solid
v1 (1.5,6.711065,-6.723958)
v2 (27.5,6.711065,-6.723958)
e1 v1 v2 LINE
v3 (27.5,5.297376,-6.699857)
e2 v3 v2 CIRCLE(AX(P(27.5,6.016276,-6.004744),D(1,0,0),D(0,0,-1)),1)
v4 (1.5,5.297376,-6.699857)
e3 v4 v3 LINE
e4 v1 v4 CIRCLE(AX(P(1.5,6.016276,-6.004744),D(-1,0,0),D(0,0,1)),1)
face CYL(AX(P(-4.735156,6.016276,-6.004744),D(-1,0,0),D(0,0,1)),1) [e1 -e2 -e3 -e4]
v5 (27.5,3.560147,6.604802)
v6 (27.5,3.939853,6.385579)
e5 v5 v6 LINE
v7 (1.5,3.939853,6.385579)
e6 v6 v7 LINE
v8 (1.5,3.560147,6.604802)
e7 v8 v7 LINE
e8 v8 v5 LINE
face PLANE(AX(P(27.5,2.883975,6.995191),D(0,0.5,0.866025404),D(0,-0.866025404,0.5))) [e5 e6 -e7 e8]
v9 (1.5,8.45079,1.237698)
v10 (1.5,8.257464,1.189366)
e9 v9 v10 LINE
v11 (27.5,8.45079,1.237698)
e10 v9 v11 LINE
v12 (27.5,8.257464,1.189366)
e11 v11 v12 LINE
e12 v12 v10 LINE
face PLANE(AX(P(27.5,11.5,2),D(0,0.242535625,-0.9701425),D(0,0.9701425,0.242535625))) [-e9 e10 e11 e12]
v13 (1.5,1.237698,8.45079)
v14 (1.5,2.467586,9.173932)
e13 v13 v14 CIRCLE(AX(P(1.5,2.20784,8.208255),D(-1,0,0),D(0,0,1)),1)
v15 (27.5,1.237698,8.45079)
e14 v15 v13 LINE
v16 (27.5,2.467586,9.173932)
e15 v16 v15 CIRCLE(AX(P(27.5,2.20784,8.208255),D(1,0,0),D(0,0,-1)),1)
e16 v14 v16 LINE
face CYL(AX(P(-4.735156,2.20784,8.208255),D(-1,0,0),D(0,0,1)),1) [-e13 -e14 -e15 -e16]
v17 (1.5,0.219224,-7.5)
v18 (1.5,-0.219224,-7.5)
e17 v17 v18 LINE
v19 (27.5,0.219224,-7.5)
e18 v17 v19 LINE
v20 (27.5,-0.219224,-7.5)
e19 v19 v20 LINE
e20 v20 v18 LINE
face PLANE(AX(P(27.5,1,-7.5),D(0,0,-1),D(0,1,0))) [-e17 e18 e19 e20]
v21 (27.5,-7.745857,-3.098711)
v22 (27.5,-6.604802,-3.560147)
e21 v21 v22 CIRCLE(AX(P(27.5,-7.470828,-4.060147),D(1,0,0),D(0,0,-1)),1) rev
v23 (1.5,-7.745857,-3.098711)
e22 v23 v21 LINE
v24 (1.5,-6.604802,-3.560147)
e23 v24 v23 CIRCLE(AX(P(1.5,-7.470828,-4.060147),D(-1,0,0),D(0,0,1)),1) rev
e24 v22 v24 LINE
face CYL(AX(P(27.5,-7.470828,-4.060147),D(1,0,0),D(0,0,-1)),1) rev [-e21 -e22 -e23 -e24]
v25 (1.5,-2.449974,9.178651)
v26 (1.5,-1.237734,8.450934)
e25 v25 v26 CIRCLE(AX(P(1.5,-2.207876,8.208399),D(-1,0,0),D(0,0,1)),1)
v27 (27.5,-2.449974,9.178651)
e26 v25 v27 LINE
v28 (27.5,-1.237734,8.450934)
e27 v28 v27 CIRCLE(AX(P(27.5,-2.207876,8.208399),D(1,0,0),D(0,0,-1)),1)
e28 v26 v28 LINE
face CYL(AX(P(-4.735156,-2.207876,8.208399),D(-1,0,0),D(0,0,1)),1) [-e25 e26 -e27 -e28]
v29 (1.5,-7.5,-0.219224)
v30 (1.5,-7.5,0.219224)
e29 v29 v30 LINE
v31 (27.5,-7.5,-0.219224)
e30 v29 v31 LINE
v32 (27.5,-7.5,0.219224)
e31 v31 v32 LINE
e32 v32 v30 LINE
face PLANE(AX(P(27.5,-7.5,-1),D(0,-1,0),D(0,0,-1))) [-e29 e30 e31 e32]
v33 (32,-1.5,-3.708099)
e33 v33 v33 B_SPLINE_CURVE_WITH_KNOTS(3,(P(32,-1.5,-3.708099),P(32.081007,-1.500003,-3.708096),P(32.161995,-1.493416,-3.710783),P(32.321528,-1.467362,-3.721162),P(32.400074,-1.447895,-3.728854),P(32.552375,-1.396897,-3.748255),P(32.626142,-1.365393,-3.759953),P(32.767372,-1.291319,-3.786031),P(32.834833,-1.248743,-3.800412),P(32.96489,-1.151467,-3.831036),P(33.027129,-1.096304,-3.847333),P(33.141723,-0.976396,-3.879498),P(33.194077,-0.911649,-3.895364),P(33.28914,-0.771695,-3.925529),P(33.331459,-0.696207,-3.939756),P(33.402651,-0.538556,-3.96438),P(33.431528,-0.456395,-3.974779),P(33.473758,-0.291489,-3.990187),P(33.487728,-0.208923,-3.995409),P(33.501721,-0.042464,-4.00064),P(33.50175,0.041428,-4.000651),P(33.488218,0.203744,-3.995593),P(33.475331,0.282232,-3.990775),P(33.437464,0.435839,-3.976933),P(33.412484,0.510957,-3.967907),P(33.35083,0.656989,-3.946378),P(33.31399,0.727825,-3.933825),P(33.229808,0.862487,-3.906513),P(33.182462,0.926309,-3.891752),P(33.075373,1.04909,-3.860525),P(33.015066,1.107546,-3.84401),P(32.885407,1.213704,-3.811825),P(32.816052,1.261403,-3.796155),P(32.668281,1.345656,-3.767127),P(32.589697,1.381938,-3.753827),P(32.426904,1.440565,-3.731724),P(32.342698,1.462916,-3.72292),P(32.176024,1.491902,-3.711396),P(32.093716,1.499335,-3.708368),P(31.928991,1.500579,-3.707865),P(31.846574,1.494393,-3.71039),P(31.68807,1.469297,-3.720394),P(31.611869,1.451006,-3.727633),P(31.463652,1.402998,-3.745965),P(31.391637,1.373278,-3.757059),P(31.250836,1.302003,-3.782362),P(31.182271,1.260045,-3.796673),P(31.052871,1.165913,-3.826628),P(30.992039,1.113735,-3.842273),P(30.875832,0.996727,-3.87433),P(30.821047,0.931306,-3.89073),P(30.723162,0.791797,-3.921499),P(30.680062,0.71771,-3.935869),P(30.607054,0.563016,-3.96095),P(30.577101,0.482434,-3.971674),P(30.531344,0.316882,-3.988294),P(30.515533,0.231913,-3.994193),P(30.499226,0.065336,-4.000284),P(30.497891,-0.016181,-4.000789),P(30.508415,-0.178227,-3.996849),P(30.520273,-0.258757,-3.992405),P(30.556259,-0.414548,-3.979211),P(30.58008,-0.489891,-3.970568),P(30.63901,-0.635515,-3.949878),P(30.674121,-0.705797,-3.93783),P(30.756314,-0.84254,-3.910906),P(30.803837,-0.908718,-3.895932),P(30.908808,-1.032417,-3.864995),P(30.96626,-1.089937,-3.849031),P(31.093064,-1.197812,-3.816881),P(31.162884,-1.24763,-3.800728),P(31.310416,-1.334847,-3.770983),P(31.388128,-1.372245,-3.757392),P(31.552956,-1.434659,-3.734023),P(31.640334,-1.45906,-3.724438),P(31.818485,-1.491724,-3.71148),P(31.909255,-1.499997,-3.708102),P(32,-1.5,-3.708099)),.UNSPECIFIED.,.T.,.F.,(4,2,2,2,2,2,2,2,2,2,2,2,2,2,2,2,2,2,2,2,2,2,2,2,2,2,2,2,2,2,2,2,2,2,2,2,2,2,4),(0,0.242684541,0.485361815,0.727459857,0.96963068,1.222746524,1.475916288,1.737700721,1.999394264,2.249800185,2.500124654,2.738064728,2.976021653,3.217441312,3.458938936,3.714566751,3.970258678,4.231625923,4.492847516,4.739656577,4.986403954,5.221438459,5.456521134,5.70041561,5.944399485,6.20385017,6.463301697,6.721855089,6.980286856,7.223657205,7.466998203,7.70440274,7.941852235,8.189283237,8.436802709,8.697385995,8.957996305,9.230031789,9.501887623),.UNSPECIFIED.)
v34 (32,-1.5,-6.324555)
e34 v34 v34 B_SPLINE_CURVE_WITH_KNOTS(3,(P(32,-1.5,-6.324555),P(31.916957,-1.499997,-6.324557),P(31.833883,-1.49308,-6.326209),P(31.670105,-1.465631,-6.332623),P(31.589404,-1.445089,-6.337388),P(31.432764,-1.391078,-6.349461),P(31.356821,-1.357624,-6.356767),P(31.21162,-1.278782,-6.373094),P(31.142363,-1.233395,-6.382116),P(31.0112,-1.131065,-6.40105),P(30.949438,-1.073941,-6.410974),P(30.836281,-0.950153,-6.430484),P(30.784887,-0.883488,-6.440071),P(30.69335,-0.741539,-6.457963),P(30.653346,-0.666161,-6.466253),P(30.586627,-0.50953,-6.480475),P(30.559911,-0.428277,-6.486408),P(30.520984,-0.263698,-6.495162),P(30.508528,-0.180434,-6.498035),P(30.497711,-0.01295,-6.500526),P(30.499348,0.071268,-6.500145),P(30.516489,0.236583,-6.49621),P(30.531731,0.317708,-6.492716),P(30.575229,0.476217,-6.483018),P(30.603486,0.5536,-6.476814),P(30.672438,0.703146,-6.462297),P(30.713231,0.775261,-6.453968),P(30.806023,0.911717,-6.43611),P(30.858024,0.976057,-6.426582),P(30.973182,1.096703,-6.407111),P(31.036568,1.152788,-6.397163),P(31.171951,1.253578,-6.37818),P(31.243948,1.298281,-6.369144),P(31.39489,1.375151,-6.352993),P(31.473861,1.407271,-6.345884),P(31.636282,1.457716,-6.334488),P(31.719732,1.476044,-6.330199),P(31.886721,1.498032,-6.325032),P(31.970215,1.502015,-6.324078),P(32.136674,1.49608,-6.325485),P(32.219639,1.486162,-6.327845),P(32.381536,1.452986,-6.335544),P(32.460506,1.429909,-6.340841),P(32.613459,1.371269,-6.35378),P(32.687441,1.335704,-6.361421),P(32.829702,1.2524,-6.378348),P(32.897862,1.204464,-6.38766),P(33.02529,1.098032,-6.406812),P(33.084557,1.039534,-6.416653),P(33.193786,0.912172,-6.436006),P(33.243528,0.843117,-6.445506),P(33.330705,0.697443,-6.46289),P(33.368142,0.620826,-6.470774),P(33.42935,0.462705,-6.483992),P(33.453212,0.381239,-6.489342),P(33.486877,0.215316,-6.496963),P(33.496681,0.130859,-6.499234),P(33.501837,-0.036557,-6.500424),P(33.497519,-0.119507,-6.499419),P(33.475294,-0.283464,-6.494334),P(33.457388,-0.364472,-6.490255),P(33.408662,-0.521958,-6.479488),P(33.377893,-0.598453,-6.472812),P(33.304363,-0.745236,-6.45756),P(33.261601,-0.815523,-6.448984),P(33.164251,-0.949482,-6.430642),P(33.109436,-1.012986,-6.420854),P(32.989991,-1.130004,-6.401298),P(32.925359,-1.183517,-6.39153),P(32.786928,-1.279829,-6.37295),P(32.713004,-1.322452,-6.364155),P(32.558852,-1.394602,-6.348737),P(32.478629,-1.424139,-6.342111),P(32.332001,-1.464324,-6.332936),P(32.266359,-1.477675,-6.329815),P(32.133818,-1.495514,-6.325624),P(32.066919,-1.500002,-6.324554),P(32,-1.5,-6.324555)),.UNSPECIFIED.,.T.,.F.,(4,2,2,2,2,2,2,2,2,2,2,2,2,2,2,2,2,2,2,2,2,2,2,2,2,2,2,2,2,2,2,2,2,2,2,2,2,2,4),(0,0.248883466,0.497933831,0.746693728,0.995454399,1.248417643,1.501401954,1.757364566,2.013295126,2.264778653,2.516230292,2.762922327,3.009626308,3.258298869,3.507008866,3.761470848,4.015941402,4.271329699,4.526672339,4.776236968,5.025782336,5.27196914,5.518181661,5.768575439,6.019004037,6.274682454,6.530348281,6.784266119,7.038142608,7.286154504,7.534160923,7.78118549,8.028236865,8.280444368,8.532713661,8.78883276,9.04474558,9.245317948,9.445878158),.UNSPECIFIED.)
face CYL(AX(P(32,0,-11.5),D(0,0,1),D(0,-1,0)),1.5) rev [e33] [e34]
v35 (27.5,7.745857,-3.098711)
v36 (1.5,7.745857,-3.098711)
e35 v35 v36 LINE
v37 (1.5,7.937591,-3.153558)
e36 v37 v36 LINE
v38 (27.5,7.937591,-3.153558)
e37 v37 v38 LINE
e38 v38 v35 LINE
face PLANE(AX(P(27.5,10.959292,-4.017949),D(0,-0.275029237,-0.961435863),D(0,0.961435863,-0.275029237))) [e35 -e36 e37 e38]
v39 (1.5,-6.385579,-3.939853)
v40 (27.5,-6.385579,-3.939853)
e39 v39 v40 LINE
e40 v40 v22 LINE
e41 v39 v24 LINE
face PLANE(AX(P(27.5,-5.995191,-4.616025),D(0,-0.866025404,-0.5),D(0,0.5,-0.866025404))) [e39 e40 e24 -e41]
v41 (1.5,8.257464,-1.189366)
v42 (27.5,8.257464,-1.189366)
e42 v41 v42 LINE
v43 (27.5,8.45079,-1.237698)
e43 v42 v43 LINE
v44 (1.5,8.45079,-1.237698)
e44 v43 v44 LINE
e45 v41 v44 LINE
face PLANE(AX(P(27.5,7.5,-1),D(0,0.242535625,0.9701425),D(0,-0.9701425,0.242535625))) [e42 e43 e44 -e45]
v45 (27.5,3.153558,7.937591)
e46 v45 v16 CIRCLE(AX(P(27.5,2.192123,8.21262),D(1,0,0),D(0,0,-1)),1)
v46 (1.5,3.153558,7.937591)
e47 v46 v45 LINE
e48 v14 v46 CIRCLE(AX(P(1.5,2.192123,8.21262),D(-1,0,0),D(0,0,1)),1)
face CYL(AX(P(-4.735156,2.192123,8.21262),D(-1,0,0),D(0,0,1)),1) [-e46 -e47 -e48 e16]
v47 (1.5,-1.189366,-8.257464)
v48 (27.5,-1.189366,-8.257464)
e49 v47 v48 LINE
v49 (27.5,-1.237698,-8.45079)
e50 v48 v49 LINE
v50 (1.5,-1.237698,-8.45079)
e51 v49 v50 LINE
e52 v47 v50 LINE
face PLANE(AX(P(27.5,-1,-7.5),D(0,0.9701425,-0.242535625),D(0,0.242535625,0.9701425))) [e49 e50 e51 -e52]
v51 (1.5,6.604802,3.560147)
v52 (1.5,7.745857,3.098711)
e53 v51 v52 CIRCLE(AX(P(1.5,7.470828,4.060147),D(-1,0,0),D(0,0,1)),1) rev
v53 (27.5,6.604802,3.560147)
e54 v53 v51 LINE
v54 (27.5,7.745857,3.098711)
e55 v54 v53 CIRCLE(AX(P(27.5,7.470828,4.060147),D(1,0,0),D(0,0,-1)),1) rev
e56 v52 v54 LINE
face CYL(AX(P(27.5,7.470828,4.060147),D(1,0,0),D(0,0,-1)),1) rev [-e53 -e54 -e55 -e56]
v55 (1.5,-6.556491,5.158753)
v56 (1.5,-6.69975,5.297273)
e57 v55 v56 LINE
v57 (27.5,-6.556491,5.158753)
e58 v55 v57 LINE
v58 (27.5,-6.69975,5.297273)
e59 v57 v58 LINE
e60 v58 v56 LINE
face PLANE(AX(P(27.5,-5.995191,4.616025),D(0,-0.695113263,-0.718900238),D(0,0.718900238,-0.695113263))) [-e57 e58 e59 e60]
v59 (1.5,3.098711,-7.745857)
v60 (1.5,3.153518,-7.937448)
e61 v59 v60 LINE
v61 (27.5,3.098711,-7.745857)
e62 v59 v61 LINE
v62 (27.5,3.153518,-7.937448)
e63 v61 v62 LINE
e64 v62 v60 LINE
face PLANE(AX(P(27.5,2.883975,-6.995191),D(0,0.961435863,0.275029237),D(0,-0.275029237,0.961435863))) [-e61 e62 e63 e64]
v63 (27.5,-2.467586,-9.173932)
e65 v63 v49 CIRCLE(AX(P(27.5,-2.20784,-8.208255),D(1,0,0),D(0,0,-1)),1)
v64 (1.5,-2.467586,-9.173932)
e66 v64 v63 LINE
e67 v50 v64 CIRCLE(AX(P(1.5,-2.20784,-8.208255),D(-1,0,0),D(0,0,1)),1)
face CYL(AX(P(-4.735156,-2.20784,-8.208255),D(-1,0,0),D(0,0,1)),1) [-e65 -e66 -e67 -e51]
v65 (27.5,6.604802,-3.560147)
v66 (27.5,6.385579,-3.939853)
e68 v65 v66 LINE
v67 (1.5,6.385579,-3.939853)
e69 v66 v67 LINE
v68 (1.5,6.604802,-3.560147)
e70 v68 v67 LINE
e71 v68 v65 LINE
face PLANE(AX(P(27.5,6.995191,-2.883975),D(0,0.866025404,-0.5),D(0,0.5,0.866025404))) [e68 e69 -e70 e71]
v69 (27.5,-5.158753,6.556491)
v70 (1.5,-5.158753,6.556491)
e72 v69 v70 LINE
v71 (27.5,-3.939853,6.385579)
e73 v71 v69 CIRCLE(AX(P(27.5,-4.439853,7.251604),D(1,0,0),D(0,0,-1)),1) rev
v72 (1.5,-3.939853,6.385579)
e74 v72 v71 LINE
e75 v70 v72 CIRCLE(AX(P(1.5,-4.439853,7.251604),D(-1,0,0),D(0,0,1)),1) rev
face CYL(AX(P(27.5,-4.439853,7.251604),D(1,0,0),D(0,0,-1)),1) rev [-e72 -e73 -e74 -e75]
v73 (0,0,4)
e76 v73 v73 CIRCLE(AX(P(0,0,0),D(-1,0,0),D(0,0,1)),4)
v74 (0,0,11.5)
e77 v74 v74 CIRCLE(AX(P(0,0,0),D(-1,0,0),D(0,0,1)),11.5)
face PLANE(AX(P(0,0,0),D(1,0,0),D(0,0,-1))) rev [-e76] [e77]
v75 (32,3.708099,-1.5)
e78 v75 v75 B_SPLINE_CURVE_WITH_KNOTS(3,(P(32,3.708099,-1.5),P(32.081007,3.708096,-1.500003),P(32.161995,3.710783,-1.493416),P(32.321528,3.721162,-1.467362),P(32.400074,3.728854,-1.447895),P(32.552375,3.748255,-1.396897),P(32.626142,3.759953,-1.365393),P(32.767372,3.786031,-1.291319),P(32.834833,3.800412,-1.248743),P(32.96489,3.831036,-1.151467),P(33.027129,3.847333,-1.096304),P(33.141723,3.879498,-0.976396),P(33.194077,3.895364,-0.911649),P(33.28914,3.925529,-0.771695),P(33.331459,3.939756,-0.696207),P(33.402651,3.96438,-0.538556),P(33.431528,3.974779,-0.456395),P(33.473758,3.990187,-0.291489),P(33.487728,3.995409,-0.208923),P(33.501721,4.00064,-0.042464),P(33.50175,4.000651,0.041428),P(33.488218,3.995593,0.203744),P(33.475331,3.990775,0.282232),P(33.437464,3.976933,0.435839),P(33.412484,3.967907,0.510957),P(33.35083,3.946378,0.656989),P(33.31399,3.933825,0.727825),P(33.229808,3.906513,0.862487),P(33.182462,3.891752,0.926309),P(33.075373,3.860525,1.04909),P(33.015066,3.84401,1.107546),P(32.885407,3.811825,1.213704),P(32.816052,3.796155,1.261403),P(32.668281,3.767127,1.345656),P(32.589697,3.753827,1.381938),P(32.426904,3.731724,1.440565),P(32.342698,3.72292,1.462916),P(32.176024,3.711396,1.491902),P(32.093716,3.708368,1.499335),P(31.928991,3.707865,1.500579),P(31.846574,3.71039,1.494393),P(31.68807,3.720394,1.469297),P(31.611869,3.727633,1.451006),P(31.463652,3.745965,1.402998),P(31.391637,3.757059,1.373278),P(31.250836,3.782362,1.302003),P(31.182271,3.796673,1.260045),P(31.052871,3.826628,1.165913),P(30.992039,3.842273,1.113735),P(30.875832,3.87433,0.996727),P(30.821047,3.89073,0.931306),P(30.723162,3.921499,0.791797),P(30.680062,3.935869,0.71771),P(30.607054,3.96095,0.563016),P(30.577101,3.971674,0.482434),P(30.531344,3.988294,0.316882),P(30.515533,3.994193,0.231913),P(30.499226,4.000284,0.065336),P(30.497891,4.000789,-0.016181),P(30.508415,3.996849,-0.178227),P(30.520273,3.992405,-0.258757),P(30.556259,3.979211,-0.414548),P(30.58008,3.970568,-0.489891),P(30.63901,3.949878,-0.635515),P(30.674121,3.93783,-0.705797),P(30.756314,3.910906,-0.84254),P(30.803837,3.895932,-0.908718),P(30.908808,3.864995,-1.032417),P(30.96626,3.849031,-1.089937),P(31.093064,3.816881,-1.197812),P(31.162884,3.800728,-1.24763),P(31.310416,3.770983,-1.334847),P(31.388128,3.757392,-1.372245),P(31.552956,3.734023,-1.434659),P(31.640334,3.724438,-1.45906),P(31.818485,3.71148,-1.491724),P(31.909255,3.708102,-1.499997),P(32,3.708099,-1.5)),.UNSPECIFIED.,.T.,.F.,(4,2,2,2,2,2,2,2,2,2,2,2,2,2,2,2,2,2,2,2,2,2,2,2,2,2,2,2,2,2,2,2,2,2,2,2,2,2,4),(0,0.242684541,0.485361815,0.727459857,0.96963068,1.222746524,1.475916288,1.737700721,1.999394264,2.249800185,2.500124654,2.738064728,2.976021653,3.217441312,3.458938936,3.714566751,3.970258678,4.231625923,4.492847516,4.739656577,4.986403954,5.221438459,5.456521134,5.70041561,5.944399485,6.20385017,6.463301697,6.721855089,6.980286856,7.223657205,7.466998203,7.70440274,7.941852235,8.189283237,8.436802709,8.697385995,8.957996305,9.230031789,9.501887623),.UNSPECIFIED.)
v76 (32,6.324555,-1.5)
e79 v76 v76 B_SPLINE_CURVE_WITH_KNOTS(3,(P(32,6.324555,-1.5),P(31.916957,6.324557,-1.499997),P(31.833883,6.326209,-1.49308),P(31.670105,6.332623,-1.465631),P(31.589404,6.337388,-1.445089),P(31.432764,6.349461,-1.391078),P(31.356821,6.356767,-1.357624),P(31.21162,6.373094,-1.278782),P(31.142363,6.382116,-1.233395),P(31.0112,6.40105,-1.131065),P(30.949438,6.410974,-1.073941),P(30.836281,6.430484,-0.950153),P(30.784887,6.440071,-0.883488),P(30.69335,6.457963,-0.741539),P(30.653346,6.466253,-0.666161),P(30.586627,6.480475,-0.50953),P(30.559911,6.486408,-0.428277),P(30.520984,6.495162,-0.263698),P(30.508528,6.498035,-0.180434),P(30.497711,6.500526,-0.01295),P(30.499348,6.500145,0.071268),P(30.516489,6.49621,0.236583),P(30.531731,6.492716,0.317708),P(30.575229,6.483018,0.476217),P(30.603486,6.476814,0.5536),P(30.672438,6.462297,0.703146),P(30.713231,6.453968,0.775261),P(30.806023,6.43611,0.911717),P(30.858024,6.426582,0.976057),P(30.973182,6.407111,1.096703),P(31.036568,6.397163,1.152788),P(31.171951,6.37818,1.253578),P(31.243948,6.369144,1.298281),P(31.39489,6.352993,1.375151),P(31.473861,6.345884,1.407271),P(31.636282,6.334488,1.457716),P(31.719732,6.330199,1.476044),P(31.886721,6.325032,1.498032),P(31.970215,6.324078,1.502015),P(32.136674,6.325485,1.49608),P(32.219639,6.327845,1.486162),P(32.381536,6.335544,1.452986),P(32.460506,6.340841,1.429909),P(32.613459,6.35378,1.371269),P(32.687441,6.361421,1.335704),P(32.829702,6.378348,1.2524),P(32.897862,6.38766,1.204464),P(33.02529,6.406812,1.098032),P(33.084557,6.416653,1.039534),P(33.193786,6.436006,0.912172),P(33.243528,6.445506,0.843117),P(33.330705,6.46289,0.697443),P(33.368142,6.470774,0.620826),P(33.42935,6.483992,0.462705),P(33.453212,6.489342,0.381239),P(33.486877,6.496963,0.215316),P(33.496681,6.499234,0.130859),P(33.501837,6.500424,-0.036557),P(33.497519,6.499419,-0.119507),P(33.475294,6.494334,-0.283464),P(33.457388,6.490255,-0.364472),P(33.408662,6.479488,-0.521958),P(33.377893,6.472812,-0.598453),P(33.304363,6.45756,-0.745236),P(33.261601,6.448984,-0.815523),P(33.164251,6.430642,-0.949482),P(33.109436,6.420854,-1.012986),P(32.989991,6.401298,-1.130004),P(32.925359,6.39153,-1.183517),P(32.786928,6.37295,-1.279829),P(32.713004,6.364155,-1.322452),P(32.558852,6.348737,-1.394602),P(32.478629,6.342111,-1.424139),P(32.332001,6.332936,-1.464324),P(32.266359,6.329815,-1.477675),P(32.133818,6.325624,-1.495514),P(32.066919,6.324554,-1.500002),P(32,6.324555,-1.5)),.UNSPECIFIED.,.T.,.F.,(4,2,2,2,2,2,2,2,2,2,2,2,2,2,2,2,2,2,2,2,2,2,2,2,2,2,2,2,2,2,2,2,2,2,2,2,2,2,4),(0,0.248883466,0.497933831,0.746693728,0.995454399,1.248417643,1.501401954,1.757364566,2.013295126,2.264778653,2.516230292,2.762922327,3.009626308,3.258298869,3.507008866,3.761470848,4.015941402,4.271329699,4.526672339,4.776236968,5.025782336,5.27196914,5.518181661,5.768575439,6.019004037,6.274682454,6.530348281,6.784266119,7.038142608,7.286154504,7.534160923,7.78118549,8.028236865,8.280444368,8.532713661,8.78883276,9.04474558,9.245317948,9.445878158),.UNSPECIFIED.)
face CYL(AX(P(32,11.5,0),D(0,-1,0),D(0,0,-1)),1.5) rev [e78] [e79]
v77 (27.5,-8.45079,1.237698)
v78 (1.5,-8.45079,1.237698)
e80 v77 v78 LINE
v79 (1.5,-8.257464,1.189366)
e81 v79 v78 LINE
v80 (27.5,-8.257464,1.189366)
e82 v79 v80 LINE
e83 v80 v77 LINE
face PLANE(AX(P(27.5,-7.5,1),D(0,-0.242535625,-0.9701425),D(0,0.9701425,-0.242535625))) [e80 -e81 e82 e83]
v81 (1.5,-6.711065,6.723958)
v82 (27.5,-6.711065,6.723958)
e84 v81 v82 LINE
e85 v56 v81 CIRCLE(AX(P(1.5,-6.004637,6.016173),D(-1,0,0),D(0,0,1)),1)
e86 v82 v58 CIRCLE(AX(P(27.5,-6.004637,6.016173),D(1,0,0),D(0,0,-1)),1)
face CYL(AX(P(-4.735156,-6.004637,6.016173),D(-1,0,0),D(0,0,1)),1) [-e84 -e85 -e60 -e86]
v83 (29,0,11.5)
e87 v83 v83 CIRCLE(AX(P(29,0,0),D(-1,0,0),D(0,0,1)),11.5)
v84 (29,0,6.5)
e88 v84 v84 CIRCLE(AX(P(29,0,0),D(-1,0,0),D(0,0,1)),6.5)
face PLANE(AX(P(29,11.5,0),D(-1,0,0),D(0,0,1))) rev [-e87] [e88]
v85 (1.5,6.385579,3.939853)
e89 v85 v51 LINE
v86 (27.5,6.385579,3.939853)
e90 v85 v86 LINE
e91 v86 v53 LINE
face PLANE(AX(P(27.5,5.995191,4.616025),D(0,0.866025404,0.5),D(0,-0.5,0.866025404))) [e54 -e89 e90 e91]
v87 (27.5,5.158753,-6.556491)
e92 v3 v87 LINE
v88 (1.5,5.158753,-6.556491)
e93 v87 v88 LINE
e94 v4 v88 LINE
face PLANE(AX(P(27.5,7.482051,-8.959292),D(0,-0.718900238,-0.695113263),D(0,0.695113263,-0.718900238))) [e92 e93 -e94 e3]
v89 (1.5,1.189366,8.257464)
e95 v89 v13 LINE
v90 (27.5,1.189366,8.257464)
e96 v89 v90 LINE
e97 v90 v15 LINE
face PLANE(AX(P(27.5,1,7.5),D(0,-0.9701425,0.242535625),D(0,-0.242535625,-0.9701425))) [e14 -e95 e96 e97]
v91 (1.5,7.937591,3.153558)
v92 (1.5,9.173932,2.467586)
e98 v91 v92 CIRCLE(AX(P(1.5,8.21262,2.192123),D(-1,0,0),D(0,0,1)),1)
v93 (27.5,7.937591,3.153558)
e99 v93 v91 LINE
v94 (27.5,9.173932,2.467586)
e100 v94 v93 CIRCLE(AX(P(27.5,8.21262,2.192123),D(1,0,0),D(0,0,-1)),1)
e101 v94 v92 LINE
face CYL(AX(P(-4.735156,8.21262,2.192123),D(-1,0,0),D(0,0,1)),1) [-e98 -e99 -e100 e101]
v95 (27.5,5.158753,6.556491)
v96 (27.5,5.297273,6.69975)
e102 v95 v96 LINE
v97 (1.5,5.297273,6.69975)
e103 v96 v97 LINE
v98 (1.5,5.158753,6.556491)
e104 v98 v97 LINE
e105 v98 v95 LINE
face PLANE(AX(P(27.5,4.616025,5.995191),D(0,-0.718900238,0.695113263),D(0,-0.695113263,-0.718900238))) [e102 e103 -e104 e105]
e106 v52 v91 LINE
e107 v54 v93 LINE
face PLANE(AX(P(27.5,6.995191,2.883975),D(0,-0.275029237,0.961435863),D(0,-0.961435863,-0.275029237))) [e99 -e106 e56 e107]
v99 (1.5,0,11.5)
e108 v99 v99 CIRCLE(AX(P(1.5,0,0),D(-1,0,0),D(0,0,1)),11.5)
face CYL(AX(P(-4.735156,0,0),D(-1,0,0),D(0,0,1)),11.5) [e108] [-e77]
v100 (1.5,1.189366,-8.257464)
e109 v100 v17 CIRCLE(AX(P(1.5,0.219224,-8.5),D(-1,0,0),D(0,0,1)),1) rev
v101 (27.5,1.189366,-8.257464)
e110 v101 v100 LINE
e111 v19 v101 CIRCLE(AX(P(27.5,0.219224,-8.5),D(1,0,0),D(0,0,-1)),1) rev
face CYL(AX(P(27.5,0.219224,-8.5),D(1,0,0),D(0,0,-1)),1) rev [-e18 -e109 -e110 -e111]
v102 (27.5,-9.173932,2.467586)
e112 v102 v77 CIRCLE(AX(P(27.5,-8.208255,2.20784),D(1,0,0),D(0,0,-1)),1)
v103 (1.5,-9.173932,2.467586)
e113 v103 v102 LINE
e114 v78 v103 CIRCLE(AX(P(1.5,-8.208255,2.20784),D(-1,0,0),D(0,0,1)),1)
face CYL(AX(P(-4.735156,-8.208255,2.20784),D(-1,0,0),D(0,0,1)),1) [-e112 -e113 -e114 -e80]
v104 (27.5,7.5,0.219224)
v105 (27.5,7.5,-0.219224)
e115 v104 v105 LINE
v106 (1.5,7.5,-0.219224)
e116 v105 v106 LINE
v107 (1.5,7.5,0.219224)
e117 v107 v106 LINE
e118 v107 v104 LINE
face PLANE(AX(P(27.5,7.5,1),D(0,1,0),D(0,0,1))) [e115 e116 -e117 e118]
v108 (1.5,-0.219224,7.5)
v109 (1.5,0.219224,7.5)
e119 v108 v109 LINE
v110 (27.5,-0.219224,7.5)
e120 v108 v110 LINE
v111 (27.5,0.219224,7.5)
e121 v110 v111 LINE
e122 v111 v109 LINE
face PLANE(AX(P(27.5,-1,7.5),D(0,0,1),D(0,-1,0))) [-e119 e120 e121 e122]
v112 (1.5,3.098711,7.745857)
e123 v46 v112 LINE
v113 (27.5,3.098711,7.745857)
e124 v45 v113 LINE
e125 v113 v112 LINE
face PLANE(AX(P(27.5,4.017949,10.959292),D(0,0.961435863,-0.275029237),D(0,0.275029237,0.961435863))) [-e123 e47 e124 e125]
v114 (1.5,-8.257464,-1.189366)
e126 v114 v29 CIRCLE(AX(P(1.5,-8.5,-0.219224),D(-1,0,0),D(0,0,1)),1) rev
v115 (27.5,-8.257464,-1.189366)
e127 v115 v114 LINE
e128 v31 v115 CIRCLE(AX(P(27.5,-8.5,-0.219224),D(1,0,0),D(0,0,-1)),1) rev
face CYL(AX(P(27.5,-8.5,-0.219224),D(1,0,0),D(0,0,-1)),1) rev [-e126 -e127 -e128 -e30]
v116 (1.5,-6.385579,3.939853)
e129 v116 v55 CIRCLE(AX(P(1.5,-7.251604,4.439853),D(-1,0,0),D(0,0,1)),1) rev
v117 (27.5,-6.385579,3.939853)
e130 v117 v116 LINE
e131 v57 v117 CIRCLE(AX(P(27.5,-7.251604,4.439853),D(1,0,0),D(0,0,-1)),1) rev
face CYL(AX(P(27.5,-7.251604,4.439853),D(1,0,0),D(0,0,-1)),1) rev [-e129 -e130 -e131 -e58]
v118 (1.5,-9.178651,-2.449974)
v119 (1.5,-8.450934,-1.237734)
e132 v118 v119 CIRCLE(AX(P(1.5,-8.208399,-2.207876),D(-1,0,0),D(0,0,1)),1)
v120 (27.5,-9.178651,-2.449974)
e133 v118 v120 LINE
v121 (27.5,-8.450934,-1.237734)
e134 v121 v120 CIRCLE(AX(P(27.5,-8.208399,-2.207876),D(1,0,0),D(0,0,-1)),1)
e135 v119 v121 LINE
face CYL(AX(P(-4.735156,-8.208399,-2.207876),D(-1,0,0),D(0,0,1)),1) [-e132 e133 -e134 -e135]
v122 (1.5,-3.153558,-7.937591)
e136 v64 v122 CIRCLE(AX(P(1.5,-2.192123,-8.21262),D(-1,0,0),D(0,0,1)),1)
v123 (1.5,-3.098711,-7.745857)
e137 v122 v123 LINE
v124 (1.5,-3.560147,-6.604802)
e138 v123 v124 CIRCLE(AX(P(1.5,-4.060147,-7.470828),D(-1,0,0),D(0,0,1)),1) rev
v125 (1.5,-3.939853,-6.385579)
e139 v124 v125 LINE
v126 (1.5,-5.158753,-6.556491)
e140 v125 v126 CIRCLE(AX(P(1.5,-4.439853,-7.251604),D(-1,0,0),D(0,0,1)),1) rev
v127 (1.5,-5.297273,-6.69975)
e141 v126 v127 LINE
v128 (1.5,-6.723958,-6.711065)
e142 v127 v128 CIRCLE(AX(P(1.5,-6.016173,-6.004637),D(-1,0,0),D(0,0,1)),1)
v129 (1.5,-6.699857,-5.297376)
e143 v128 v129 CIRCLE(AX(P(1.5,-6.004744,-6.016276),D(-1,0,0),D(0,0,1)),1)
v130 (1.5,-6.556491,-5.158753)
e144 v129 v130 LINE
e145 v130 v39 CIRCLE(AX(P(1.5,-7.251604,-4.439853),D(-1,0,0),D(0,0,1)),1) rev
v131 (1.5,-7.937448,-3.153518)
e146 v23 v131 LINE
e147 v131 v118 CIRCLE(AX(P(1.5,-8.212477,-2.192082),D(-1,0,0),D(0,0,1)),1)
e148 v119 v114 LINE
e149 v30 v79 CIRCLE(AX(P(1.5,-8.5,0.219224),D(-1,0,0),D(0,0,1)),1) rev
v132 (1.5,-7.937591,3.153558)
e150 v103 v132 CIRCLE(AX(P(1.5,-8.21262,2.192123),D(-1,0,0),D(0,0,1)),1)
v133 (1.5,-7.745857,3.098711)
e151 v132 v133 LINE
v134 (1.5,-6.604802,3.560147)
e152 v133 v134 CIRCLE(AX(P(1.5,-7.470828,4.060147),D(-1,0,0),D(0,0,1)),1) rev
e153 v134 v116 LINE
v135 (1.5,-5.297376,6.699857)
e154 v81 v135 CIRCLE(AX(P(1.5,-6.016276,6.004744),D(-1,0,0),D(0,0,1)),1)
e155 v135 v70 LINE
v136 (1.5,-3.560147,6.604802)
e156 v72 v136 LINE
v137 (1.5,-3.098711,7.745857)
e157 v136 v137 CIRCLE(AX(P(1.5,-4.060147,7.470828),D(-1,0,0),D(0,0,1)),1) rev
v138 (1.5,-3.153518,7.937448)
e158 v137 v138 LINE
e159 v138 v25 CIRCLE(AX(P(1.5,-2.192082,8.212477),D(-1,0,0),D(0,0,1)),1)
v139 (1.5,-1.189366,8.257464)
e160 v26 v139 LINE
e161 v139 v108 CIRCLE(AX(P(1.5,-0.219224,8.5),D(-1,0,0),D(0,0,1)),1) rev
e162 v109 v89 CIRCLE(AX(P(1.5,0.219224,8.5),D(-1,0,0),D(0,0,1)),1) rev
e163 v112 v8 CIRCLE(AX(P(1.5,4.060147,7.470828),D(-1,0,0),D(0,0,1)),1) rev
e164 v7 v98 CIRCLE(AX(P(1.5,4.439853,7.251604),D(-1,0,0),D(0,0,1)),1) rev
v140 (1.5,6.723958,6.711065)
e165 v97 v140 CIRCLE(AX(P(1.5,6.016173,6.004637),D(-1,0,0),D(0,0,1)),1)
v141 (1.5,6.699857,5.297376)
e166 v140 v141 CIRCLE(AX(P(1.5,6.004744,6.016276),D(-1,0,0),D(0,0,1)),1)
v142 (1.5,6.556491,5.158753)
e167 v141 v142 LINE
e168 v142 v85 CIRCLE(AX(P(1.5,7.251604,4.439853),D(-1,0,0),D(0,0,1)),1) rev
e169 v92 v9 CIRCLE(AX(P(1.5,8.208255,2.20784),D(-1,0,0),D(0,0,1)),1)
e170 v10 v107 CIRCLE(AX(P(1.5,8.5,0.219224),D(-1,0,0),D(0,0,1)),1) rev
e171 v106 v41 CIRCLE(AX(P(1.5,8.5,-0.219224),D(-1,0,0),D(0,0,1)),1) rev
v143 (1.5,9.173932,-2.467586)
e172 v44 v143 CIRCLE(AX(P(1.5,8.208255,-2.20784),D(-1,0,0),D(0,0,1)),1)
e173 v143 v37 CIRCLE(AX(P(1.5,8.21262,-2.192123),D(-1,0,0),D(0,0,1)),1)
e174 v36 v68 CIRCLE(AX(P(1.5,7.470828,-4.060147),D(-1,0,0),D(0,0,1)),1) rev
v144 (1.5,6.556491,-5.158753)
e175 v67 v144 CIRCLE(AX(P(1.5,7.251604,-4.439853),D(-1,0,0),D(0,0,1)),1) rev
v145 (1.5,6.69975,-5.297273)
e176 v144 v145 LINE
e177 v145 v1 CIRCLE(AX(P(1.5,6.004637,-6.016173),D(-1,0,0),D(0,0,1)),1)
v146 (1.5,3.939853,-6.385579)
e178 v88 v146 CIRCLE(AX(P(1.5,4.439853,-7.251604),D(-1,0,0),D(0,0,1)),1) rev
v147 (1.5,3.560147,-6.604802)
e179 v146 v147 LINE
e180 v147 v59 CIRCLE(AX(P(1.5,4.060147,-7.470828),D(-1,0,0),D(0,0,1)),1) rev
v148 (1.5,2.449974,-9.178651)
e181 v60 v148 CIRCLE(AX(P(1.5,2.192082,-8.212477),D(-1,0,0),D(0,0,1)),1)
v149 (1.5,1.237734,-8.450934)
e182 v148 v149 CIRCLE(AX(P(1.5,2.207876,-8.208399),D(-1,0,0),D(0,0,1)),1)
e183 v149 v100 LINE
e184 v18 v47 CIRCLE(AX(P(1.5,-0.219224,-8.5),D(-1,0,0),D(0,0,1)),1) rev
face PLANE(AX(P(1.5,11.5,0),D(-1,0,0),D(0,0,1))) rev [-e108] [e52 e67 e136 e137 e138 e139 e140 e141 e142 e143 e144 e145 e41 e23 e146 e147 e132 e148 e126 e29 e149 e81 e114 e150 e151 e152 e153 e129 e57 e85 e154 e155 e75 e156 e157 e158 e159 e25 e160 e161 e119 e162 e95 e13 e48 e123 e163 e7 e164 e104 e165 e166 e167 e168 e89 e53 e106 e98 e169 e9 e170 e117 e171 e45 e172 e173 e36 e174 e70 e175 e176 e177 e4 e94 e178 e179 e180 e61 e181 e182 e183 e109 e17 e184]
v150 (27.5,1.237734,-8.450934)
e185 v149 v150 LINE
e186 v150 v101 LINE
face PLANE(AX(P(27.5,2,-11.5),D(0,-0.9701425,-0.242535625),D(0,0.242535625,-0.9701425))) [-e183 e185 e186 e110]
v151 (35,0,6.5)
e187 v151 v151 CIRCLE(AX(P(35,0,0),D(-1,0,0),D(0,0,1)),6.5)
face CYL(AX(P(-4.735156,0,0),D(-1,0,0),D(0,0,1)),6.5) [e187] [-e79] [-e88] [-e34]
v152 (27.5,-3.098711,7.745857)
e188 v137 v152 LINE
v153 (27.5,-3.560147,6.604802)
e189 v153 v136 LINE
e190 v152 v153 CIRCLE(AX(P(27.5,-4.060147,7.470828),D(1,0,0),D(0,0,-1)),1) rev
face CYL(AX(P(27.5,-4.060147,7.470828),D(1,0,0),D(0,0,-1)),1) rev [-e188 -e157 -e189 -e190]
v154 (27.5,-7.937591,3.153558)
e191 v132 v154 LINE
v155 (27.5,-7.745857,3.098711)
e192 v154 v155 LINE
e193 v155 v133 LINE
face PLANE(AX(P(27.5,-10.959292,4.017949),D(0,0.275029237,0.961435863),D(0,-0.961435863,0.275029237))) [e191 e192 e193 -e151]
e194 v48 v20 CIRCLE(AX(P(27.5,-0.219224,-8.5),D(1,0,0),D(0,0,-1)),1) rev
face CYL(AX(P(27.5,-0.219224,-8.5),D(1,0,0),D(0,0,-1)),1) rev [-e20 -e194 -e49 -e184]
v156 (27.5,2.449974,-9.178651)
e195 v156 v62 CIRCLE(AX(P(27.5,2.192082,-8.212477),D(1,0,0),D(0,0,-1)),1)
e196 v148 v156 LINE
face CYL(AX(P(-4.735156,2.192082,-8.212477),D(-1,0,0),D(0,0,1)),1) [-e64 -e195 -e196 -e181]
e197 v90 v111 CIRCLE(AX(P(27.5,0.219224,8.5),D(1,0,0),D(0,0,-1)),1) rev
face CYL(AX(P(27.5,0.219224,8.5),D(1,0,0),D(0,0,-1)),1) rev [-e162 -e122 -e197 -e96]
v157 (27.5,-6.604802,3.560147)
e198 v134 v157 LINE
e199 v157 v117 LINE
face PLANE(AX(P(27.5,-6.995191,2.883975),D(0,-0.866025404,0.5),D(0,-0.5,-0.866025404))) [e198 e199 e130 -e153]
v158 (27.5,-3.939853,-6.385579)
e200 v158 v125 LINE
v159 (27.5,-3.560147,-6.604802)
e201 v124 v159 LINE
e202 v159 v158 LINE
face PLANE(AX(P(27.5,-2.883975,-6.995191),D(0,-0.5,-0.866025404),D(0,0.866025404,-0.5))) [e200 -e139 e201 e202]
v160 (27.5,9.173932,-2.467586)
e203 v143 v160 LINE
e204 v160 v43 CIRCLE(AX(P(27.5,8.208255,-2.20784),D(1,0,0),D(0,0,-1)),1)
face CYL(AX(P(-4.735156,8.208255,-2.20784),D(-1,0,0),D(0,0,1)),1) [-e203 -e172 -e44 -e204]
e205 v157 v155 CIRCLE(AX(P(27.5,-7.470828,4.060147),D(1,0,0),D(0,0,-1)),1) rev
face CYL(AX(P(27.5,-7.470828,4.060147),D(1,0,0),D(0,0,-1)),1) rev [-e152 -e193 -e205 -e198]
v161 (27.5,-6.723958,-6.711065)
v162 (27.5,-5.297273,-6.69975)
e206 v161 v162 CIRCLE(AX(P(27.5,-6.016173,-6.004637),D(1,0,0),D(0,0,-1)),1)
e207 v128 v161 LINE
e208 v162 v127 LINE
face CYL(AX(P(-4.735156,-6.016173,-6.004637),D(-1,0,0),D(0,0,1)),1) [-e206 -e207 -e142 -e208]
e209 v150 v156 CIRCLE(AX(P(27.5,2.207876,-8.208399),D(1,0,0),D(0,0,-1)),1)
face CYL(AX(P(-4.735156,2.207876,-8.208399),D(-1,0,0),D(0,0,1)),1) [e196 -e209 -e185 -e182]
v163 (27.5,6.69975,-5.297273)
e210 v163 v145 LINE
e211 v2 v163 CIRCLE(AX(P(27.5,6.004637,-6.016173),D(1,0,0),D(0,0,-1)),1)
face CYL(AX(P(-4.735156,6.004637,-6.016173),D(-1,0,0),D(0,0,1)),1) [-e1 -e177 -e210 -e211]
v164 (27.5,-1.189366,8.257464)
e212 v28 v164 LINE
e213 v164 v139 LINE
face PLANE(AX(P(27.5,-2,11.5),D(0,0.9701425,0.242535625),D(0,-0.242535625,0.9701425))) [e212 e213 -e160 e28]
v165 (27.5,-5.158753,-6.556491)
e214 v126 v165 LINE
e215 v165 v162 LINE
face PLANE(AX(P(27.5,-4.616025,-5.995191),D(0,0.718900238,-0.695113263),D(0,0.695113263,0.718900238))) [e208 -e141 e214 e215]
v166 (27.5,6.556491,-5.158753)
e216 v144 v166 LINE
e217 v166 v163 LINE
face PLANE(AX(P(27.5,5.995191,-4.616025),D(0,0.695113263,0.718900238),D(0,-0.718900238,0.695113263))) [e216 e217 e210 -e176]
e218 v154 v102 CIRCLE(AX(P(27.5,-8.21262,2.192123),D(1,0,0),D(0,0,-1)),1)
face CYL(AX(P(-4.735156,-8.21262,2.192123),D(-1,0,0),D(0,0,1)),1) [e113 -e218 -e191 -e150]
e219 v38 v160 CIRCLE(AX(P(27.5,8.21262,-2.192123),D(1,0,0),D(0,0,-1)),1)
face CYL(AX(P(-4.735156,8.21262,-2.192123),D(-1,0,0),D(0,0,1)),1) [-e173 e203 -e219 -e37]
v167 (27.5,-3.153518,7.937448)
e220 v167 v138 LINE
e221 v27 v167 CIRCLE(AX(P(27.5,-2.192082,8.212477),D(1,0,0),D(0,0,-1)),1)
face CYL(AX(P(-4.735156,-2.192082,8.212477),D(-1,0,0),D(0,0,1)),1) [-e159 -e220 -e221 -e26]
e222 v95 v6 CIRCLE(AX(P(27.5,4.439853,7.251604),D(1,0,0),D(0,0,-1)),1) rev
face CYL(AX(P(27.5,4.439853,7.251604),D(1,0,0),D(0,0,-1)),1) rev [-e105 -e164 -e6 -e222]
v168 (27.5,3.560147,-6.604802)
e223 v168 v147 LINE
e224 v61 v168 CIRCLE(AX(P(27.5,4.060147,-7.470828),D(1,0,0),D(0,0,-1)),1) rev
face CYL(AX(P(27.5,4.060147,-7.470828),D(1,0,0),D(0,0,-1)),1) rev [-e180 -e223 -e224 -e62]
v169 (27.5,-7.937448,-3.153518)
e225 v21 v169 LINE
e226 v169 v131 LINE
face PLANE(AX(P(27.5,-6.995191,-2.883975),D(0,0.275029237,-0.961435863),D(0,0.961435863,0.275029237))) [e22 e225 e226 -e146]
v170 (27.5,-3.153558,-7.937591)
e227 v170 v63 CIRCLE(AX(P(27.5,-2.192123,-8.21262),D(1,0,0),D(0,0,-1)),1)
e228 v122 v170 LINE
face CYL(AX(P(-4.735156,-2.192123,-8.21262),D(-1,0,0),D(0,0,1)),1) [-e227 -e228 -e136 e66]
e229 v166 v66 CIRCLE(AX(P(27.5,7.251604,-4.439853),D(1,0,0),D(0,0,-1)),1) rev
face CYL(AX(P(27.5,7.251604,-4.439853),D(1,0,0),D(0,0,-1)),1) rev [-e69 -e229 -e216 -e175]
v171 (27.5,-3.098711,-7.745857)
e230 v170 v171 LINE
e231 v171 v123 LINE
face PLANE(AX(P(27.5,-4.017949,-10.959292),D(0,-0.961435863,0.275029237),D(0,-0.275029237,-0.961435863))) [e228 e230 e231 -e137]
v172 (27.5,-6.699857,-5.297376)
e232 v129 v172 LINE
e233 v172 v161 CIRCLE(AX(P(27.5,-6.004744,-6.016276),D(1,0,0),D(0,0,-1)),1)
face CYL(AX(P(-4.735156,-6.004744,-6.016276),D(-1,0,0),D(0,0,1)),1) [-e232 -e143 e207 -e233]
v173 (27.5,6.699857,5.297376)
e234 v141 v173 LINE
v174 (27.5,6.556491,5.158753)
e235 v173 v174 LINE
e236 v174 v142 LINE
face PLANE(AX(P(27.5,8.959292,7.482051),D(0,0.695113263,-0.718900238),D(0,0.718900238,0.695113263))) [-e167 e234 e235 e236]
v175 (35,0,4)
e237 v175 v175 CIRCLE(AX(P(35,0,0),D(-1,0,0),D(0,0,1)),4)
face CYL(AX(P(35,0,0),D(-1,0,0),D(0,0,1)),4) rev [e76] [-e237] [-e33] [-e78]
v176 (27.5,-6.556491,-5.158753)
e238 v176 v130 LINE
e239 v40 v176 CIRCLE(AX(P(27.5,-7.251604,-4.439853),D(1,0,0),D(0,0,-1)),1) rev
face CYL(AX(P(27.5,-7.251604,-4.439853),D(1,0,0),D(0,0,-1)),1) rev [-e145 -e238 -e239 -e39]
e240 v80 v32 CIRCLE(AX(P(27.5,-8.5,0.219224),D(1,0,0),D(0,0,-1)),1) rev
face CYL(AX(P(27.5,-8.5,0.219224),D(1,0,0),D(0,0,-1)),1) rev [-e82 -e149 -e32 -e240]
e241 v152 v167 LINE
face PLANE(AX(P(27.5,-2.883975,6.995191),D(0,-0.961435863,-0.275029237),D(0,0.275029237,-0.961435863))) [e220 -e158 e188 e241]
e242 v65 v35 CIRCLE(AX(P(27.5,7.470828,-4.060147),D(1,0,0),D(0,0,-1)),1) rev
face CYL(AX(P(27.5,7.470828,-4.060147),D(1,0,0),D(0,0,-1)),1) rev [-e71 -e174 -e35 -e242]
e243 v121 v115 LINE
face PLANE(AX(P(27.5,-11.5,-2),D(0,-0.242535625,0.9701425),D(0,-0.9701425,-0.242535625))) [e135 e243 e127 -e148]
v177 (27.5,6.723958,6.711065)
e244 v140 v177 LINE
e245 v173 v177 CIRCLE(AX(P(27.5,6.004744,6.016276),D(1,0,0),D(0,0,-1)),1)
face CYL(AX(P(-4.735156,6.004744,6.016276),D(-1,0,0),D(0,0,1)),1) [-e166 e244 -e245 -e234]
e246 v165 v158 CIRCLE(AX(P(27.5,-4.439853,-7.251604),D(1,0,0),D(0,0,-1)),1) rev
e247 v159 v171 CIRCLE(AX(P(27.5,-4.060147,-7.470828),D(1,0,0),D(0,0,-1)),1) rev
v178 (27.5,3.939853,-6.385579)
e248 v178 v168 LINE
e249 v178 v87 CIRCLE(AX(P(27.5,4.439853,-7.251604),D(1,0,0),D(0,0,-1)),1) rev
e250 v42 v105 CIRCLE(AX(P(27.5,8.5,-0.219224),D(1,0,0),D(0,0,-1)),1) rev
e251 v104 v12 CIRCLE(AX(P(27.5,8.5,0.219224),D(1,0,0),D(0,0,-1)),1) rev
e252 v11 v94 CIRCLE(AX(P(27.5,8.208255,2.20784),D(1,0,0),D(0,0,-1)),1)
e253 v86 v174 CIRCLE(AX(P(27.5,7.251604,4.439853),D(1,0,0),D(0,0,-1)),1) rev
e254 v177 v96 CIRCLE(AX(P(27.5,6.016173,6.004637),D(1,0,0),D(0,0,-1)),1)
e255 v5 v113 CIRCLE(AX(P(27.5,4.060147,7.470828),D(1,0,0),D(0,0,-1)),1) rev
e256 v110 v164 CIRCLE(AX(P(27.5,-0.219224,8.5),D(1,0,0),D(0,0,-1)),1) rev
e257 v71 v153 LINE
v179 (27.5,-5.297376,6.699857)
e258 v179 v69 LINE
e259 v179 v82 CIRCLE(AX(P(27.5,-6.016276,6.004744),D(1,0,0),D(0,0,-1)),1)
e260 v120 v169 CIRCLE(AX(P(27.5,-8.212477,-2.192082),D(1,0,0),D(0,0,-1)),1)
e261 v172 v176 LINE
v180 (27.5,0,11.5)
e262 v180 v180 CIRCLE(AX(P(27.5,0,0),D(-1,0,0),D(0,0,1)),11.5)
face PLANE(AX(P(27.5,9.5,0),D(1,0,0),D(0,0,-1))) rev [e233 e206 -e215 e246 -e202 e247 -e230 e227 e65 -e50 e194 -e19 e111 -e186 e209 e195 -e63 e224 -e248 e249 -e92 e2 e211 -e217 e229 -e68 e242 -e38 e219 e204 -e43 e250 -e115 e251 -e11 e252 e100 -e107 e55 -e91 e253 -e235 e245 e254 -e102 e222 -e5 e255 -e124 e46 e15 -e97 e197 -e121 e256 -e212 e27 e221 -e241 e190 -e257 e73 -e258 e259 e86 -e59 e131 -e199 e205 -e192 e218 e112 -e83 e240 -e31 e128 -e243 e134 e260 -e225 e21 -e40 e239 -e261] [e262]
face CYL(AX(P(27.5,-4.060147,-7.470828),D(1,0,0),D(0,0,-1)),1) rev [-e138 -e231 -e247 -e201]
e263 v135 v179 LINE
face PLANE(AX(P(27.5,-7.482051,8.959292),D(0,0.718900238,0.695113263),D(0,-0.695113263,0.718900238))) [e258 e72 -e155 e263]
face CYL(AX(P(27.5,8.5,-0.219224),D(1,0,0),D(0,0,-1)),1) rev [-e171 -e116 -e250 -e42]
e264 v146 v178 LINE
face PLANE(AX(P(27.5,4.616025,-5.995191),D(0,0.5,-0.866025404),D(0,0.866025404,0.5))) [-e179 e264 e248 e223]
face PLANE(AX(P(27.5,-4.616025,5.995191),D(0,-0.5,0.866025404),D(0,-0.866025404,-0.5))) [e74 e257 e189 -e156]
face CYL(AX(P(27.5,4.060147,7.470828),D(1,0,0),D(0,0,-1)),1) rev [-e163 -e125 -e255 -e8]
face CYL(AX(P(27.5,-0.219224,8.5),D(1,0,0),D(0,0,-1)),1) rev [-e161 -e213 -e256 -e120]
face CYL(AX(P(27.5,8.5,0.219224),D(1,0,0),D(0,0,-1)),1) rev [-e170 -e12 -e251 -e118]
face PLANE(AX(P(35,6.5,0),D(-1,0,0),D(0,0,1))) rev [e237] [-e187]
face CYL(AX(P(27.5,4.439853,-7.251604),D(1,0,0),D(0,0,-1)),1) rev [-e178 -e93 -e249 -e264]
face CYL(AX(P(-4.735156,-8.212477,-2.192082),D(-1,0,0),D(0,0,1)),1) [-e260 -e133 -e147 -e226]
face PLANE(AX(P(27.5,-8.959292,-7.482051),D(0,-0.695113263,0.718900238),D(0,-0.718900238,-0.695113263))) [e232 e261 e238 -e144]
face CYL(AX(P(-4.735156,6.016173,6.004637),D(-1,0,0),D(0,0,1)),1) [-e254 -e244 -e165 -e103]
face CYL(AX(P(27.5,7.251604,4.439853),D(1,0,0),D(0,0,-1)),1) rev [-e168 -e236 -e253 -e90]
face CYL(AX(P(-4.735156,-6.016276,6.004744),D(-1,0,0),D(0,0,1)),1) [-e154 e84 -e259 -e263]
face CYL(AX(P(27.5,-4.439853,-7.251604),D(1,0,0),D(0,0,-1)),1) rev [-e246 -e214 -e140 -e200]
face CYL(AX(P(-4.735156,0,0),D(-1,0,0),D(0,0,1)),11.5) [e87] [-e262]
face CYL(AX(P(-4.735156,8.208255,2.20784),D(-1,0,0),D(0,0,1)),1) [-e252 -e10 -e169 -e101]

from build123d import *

# Parameters (mm, degrees)
SKETCH2_R          = 4
CUT_EXTRUDE1_DEPTH = 39.594040991
SKETCH3_R          = 1.5
CUT_EXTRUDE2_DEPTH = 39.594040991
CIRPATTERN1_COUNT  = 2
CIRPATTERN1_ANGLE  = 90
CUT_EXTRUDE3_DEPTH = 26
FILLET2_R          = 1
CIRPATTERN2_START  = 1.5
CIRPATTERN2_DEPTH  = 26


# Read off the part's stored shape, not the designer's step: CirPattern2
with BuildPart() as part:
    # Sketch1 → Revolve1 (revolve)
    with BuildSketch(Plane.XY, mode=Mode.PRIVATE) as revolve1_sk:
        Polygon((0, 0), (0, 11.5), (1.5, 11.5), (1.5, 9.5), (27.5, 9.5), (27.5, 11.5), (29, 11.5), (29, 6.5), (35, 6.5), (35, 0), align=None)
    revolve(revolve1_sk.sketch.rotate(Axis((-4.735156117, 0, 0), (1, 0, 0)), 90), axis=Axis((-4.735156117, 0, 0), (1, 0, 0)))

    # Sketch2 → Cut-Extrude1 (cut, through all)
    with BuildSketch(Plane.ZY):
        Circle(SKETCH2_R)
    extrude(amount=-CUT_EXTRUDE1_DEPTH, mode=Mode.SUBTRACT)

    # Sketch3 → Cut-Extrude2 (cut, through all)
    with BuildSketch(Plane(origin=(0, 0, 0), x_dir=(1, 0, 0), z_dir=(0, 1, 0))):
        with Locations(Location((32, 0, 0), (0, 0, 90))):
            Circle(SKETCH3_R)
    cut_extrude2 = extrude(amount=CUT_EXTRUDE2_DEPTH, mode=Mode.SUBTRACT)

    # CirPattern1: Cut-Extrude2 ×2 about axis
    cirpattern1_axis = Axis((-4.735156117, 0, 0), (-1, 0, 0))
    for i in range(1, CIRPATTERN1_COUNT):
        add(cut_extrude2.rotate(cirpattern1_axis, i * CIRPATTERN1_ANGLE / (CIRPATTERN1_COUNT - 1)), mode=Mode.SUBTRACT)

    # Sketch4 → Cut-Extrude3 (cut)
    with BuildSketch(Plane(origin=(1.5, 0, 0), x_dir=(0, 0, -1), z_dir=(1, 0, 0))):
        Polygon((2, 11.5), (-2, 11.5), (-1, 7.5), (1, 7.5), align=None)
    extrude(amount=CUT_EXTRUDE3_DEPTH, mode=Mode.SUBTRACT)

    # Fillet2
    fillet2_edges = [part.edges().sort_by_distance(p)[0] for p in [
        (14.5, 7.5, -1),
        (14.5, 9.385369037, -1.471342259),
        (14.5, 9.385369037, 1.471342259),
        (14.5, 7.5, 1),
    ]]
    fillet(fillet2_edges, radius=FILLET2_R)

    # CirPattern2 outline → CirPattern2 (cut)
    with BuildSketch(Plane.YZ.offset(CIRPATTERN2_START)):
        with BuildLine():
            ThreePointArc((9.173931529, 2.467585925), (8.227241336, 4.75), (6.723957861, 6.711064794))
            ThreePointArc((6.723957861, 6.711064794), (7.00459855, 5.999230542), (6.6998571, 5.297375964))
            Line((6.6998571, 5.297375964), (6.556490873, 5.158753439))
            ThreePointArc((6.556490873, 5.158753439), (6.261292098, 4.578713089), (6.385578732, 3.939853201))
            Line((6.385578732, 3.939853201), (6.604802325, 3.560146799))
            ThreePointArc((6.604802325, 3.560146799), (7.095927901, 3.133081473), (7.745856966, 3.098710936))
            Line((7.745856966, 3.098710936), (7.937590709, 3.153558469))
            ThreePointArc((7.937590709, 3.153558469), (8.697785327, 3.066545017), (9.173931529, 2.467585925))
        make_face()
        with BuildLine():
            ThreePointArc((6.723957861, 6.711064794), (4.757893172, 8.22267916), (2.467585925, 9.173931529))
            ThreePointArc((2.467585925, 9.173931529), (3.066545017, 8.697785327), (3.153558469, 7.937590709))
            Line((3.153558469, 7.937590709), (3.098710936, 7.745856966))
            ThreePointArc((3.098710936, 7.745856966), (3.133081473, 7.095927901), (3.560146799, 6.604802325))
            Line((3.560146799, 6.604802325), (3.939853201, 6.385578732))
            ThreePointArc((3.939853201, 6.385578732), (4.578713089, 6.261292098), (5.158753439, 6.556490873))
            Line((5.158753439, 6.556490873), (5.297272586, 6.699750184))
            ThreePointArc((5.297272586, 6.699750184), (6.008242375, 7.004605475), (6.723957861, 6.711064794))
        make_face()
        with BuildLine():
            ThreePointArc((2.467585925, 9.173931529), (0.009116775, 9.499995625), (-2.449973668, 9.178650719))
            ThreePointArc((-2.449973668, 9.178650719), (-1.693186777, 9.065775559), (-1.237733608, 8.450934433))
            Line((-1.237733608, 8.450934433), (-1.189366094, 8.257464375))
            ThreePointArc((-1.189366094, 8.257464375), (-0.834635803, 7.711794562), (-0.219223594, 7.5))
            Line((-0.219223594, 7.5), (0.219223594, 7.5))
            ThreePointArc((0.219223594, 7.5), (0.834635803, 7.711794562), (1.189366094, 8.257464375))
            Line((1.189366094, 8.257464375), (1.237697538, 8.450790151))
            ThreePointArc((1.237697538, 8.450790151), (1.700987791, 9.070287472), (2.467585925, 9.173931529))
        make_face()
        with BuildLine():
            ThreePointArc((-2.449973668, 9.178650719), (-4.742102454, 8.231795935), (-6.711064795, 6.723957862))
            ThreePointArc((-6.711064795, 6.723957862), (-5.999230542, 7.00459855), (-5.297375964, 6.6998571))
            Line((-5.297375964, 6.6998571), (-5.158753439, 6.556490873))
            ThreePointArc((-5.158753439, 6.556490873), (-4.578713089, 6.261292098), (-3.939853201, 6.385578732))
            Line((-3.939853201, 6.385578732), (-3.560146799, 6.604802325))
            ThreePointArc((-3.560146799, 6.604802325), (-3.133081473, 7.095927901), (-3.098710936, 7.745856966))
            Line((-3.098710936, 7.745856966), (-3.153517566, 7.937447722))
            ThreePointArc((-3.153517566, 7.937447722), (-3.062045097, 8.705593266), (-2.449973668, 9.178650719))
        make_face()
        with BuildLine():
            ThreePointArc((-6.711064795, 6.723957862), (-8.22267916, 4.757893172), (-9.173931529, 2.467585925))
            ThreePointArc((-9.173931529, 2.467585925), (-8.697785327, 3.066545017), (-7.937590709, 3.153558469))
            Line((-7.937590709, 3.153558469), (-7.745856966, 3.098710936))
            ThreePointArc((-7.745856966, 3.098710936), (-7.095927901, 3.133081473), (-6.604802325, 3.560146799))
            Line((-6.604802325, 3.560146799), (-6.385578732, 3.939853201))
            ThreePointArc((-6.385578732, 3.939853201), (-6.261292098, 4.578713089), (-6.556490873, 5.158753439))
            Line((-6.556490873, 5.158753439), (-6.699750184, 5.297272586))
            ThreePointArc((-6.699750184, 5.297272586), (-7.004605475, 6.008242375), (-6.711064795, 6.723957862))
        make_face()
        with BuildLine():
            ThreePointArc((-9.173931529, 2.467585925), (-9.499995625, 0.009116775), (-9.178650719, -2.449973668))
            ThreePointArc((-9.178650719, -2.449973668), (-9.065775559, -1.693186777), (-8.450934433, -1.237733608))
            Line((-8.450934433, -1.237733608), (-8.257464375, -1.189366094))
            ThreePointArc((-8.257464375, -1.189366094), (-7.711794562, -0.834635803), (-7.5, -0.219223594))
            Line((-7.5, -0.219223594), (-7.5, 0.219223594))
            ThreePointArc((-7.5, 0.219223594), (-7.711794562, 0.834635803), (-8.257464375, 1.189366094))
            Line((-8.257464375, 1.189366094), (-8.450790151, 1.237697538))
            ThreePointArc((-8.450790151, 1.237697538), (-9.070287472, 1.700987791), (-9.173931529, 2.467585925))
        make_face()
        with BuildLine():
            ThreePointArc((-9.178650719, -2.449973668), (-8.231795935, -4.742102454), (-6.723957862, -6.711064795))
            ThreePointArc((-6.723957862, -6.711064795), (-7.00459855, -5.999230542), (-6.6998571, -5.297375964))
            Line((-6.6998571, -5.297375964), (-6.556490873, -5.158753439))
            ThreePointArc((-6.556490873, -5.158753439), (-6.261292098, -4.578713089), (-6.385578732, -3.939853201))
            Line((-6.385578732, -3.939853201), (-6.604802325, -3.560146799))
            ThreePointArc((-6.604802325, -3.560146799), (-7.095927901, -3.133081473), (-7.745856966, -3.098710936))
            Line((-7.745856966, -3.098710936), (-7.937447722, -3.153517566))
            ThreePointArc((-7.937447722, -3.153517566), (-8.705593266, -3.062045097), (-9.178650719, -2.449973668))
        make_face()
        with BuildLine():
            ThreePointArc((-6.723957862, -6.711064795), (-4.757893172, -8.22267916), (-2.467585925, -9.173931529))
            ThreePointArc((-2.467585925, -9.173931529), (-3.066545017, -8.697785327), (-3.153558469, -7.937590709))
            Line((-3.153558469, -7.937590709), (-3.098710936, -7.745856966))
            ThreePointArc((-3.098710936, -7.745856966), (-3.133081473, -7.095927901), (-3.560146799, -6.604802325))
            Line((-3.560146799, -6.604802325), (-3.939853201, -6.385578732))
            ThreePointArc((-3.939853201, -6.385578732), (-4.578713089, -6.261292098), (-5.158753439, -6.556490873))
            Line((-5.158753439, -6.556490873), (-5.297272586, -6.699750184))
            ThreePointArc((-5.297272586, -6.699750184), (-6.008242375, -7.004605475), (-6.723957862, -6.711064795))
        make_face()
        with BuildLine():
            ThreePointArc((-2.467585925, -9.173931529), (-0.009116775, -9.499995625), (2.449973668, -9.178650719))
            ThreePointArc((2.449973668, -9.178650719), (1.693186777, -9.065775559), (1.237733608, -8.450934433))
            Line((1.237733608, -8.450934433), (1.189366094, -8.257464375))
            ThreePointArc((1.189366094, -8.257464375), (0.834635803, -7.711794562), (0.219223594, -7.5))
            Line((0.219223594, -7.5), (-0.219223594, -7.5))
            ThreePointArc((-0.219223594, -7.5), (-0.834635803, -7.711794562), (-1.189366094, -8.257464375))
            Line((-1.189366094, -8.257464375), (-1.237697538, -8.450790151))
            ThreePointArc((-1.237697538, -8.450790151), (-1.700987791, -9.070287472), (-2.467585925, -9.173931529))
        make_face()
        with BuildLine():
            ThreePointArc((2.449973668, -9.178650719), (4.742102454, -8.231795935), (6.711064794, -6.723957861))
            ThreePointArc((6.711064794, -6.723957861), (5.999230542, -7.00459855), (5.297375964, -6.6998571))
            Line((5.297375964, -6.6998571), (5.158753439, -6.556490873))
            ThreePointArc((5.158753439, -6.556490873), (4.578713089, -6.261292098), (3.939853201, -6.385578732))
            Line((3.939853201, -6.385578732), (3.560146799, -6.604802325))
            ThreePointArc((3.560146799, -6.604802325), (3.133081473, -7.095927901), (3.098710936, -7.745856966))
            Line((3.098710936, -7.745856966), (3.153517566, -7.937447722))
            ThreePointArc((3.153517566, -7.937447722), (3.062045097, -8.705593266), (2.449973668, -9.178650719))
        make_face()
        with BuildLine():
            Line((6.556490873, -5.158753439), (6.699750184, -5.297272586))
            ThreePointArc((6.699750184, -5.297272586), (7.004605475, -6.008242375), (6.711064795, -6.723957862))
            ThreePointArc((6.711064795, -6.723957862), (8.22267916, -4.757893172), (9.173931529, -2.467585925))
            ThreePointArc((9.173931529, -2.467585925), (8.697785327, -3.066545017), (7.937590709, -3.153558469))
            Line((7.937590709, -3.153558469), (7.745856966, -3.098710936))
            ThreePointArc((7.745856966, -3.098710936), (7.095927901, -3.133081473), (6.604802325, -3.560146799))
            Line((6.604802325, -3.560146799), (6.385578732, -3.939853201))
            ThreePointArc((6.385578732, -3.939853201), (6.261292098, -4.578713089), (6.556490873, -5.158753439))
        make_face()
    extrude(amount=CIRPATTERN2_DEPTH, mode=Mode.SUBTRACT)


solid = part.part
